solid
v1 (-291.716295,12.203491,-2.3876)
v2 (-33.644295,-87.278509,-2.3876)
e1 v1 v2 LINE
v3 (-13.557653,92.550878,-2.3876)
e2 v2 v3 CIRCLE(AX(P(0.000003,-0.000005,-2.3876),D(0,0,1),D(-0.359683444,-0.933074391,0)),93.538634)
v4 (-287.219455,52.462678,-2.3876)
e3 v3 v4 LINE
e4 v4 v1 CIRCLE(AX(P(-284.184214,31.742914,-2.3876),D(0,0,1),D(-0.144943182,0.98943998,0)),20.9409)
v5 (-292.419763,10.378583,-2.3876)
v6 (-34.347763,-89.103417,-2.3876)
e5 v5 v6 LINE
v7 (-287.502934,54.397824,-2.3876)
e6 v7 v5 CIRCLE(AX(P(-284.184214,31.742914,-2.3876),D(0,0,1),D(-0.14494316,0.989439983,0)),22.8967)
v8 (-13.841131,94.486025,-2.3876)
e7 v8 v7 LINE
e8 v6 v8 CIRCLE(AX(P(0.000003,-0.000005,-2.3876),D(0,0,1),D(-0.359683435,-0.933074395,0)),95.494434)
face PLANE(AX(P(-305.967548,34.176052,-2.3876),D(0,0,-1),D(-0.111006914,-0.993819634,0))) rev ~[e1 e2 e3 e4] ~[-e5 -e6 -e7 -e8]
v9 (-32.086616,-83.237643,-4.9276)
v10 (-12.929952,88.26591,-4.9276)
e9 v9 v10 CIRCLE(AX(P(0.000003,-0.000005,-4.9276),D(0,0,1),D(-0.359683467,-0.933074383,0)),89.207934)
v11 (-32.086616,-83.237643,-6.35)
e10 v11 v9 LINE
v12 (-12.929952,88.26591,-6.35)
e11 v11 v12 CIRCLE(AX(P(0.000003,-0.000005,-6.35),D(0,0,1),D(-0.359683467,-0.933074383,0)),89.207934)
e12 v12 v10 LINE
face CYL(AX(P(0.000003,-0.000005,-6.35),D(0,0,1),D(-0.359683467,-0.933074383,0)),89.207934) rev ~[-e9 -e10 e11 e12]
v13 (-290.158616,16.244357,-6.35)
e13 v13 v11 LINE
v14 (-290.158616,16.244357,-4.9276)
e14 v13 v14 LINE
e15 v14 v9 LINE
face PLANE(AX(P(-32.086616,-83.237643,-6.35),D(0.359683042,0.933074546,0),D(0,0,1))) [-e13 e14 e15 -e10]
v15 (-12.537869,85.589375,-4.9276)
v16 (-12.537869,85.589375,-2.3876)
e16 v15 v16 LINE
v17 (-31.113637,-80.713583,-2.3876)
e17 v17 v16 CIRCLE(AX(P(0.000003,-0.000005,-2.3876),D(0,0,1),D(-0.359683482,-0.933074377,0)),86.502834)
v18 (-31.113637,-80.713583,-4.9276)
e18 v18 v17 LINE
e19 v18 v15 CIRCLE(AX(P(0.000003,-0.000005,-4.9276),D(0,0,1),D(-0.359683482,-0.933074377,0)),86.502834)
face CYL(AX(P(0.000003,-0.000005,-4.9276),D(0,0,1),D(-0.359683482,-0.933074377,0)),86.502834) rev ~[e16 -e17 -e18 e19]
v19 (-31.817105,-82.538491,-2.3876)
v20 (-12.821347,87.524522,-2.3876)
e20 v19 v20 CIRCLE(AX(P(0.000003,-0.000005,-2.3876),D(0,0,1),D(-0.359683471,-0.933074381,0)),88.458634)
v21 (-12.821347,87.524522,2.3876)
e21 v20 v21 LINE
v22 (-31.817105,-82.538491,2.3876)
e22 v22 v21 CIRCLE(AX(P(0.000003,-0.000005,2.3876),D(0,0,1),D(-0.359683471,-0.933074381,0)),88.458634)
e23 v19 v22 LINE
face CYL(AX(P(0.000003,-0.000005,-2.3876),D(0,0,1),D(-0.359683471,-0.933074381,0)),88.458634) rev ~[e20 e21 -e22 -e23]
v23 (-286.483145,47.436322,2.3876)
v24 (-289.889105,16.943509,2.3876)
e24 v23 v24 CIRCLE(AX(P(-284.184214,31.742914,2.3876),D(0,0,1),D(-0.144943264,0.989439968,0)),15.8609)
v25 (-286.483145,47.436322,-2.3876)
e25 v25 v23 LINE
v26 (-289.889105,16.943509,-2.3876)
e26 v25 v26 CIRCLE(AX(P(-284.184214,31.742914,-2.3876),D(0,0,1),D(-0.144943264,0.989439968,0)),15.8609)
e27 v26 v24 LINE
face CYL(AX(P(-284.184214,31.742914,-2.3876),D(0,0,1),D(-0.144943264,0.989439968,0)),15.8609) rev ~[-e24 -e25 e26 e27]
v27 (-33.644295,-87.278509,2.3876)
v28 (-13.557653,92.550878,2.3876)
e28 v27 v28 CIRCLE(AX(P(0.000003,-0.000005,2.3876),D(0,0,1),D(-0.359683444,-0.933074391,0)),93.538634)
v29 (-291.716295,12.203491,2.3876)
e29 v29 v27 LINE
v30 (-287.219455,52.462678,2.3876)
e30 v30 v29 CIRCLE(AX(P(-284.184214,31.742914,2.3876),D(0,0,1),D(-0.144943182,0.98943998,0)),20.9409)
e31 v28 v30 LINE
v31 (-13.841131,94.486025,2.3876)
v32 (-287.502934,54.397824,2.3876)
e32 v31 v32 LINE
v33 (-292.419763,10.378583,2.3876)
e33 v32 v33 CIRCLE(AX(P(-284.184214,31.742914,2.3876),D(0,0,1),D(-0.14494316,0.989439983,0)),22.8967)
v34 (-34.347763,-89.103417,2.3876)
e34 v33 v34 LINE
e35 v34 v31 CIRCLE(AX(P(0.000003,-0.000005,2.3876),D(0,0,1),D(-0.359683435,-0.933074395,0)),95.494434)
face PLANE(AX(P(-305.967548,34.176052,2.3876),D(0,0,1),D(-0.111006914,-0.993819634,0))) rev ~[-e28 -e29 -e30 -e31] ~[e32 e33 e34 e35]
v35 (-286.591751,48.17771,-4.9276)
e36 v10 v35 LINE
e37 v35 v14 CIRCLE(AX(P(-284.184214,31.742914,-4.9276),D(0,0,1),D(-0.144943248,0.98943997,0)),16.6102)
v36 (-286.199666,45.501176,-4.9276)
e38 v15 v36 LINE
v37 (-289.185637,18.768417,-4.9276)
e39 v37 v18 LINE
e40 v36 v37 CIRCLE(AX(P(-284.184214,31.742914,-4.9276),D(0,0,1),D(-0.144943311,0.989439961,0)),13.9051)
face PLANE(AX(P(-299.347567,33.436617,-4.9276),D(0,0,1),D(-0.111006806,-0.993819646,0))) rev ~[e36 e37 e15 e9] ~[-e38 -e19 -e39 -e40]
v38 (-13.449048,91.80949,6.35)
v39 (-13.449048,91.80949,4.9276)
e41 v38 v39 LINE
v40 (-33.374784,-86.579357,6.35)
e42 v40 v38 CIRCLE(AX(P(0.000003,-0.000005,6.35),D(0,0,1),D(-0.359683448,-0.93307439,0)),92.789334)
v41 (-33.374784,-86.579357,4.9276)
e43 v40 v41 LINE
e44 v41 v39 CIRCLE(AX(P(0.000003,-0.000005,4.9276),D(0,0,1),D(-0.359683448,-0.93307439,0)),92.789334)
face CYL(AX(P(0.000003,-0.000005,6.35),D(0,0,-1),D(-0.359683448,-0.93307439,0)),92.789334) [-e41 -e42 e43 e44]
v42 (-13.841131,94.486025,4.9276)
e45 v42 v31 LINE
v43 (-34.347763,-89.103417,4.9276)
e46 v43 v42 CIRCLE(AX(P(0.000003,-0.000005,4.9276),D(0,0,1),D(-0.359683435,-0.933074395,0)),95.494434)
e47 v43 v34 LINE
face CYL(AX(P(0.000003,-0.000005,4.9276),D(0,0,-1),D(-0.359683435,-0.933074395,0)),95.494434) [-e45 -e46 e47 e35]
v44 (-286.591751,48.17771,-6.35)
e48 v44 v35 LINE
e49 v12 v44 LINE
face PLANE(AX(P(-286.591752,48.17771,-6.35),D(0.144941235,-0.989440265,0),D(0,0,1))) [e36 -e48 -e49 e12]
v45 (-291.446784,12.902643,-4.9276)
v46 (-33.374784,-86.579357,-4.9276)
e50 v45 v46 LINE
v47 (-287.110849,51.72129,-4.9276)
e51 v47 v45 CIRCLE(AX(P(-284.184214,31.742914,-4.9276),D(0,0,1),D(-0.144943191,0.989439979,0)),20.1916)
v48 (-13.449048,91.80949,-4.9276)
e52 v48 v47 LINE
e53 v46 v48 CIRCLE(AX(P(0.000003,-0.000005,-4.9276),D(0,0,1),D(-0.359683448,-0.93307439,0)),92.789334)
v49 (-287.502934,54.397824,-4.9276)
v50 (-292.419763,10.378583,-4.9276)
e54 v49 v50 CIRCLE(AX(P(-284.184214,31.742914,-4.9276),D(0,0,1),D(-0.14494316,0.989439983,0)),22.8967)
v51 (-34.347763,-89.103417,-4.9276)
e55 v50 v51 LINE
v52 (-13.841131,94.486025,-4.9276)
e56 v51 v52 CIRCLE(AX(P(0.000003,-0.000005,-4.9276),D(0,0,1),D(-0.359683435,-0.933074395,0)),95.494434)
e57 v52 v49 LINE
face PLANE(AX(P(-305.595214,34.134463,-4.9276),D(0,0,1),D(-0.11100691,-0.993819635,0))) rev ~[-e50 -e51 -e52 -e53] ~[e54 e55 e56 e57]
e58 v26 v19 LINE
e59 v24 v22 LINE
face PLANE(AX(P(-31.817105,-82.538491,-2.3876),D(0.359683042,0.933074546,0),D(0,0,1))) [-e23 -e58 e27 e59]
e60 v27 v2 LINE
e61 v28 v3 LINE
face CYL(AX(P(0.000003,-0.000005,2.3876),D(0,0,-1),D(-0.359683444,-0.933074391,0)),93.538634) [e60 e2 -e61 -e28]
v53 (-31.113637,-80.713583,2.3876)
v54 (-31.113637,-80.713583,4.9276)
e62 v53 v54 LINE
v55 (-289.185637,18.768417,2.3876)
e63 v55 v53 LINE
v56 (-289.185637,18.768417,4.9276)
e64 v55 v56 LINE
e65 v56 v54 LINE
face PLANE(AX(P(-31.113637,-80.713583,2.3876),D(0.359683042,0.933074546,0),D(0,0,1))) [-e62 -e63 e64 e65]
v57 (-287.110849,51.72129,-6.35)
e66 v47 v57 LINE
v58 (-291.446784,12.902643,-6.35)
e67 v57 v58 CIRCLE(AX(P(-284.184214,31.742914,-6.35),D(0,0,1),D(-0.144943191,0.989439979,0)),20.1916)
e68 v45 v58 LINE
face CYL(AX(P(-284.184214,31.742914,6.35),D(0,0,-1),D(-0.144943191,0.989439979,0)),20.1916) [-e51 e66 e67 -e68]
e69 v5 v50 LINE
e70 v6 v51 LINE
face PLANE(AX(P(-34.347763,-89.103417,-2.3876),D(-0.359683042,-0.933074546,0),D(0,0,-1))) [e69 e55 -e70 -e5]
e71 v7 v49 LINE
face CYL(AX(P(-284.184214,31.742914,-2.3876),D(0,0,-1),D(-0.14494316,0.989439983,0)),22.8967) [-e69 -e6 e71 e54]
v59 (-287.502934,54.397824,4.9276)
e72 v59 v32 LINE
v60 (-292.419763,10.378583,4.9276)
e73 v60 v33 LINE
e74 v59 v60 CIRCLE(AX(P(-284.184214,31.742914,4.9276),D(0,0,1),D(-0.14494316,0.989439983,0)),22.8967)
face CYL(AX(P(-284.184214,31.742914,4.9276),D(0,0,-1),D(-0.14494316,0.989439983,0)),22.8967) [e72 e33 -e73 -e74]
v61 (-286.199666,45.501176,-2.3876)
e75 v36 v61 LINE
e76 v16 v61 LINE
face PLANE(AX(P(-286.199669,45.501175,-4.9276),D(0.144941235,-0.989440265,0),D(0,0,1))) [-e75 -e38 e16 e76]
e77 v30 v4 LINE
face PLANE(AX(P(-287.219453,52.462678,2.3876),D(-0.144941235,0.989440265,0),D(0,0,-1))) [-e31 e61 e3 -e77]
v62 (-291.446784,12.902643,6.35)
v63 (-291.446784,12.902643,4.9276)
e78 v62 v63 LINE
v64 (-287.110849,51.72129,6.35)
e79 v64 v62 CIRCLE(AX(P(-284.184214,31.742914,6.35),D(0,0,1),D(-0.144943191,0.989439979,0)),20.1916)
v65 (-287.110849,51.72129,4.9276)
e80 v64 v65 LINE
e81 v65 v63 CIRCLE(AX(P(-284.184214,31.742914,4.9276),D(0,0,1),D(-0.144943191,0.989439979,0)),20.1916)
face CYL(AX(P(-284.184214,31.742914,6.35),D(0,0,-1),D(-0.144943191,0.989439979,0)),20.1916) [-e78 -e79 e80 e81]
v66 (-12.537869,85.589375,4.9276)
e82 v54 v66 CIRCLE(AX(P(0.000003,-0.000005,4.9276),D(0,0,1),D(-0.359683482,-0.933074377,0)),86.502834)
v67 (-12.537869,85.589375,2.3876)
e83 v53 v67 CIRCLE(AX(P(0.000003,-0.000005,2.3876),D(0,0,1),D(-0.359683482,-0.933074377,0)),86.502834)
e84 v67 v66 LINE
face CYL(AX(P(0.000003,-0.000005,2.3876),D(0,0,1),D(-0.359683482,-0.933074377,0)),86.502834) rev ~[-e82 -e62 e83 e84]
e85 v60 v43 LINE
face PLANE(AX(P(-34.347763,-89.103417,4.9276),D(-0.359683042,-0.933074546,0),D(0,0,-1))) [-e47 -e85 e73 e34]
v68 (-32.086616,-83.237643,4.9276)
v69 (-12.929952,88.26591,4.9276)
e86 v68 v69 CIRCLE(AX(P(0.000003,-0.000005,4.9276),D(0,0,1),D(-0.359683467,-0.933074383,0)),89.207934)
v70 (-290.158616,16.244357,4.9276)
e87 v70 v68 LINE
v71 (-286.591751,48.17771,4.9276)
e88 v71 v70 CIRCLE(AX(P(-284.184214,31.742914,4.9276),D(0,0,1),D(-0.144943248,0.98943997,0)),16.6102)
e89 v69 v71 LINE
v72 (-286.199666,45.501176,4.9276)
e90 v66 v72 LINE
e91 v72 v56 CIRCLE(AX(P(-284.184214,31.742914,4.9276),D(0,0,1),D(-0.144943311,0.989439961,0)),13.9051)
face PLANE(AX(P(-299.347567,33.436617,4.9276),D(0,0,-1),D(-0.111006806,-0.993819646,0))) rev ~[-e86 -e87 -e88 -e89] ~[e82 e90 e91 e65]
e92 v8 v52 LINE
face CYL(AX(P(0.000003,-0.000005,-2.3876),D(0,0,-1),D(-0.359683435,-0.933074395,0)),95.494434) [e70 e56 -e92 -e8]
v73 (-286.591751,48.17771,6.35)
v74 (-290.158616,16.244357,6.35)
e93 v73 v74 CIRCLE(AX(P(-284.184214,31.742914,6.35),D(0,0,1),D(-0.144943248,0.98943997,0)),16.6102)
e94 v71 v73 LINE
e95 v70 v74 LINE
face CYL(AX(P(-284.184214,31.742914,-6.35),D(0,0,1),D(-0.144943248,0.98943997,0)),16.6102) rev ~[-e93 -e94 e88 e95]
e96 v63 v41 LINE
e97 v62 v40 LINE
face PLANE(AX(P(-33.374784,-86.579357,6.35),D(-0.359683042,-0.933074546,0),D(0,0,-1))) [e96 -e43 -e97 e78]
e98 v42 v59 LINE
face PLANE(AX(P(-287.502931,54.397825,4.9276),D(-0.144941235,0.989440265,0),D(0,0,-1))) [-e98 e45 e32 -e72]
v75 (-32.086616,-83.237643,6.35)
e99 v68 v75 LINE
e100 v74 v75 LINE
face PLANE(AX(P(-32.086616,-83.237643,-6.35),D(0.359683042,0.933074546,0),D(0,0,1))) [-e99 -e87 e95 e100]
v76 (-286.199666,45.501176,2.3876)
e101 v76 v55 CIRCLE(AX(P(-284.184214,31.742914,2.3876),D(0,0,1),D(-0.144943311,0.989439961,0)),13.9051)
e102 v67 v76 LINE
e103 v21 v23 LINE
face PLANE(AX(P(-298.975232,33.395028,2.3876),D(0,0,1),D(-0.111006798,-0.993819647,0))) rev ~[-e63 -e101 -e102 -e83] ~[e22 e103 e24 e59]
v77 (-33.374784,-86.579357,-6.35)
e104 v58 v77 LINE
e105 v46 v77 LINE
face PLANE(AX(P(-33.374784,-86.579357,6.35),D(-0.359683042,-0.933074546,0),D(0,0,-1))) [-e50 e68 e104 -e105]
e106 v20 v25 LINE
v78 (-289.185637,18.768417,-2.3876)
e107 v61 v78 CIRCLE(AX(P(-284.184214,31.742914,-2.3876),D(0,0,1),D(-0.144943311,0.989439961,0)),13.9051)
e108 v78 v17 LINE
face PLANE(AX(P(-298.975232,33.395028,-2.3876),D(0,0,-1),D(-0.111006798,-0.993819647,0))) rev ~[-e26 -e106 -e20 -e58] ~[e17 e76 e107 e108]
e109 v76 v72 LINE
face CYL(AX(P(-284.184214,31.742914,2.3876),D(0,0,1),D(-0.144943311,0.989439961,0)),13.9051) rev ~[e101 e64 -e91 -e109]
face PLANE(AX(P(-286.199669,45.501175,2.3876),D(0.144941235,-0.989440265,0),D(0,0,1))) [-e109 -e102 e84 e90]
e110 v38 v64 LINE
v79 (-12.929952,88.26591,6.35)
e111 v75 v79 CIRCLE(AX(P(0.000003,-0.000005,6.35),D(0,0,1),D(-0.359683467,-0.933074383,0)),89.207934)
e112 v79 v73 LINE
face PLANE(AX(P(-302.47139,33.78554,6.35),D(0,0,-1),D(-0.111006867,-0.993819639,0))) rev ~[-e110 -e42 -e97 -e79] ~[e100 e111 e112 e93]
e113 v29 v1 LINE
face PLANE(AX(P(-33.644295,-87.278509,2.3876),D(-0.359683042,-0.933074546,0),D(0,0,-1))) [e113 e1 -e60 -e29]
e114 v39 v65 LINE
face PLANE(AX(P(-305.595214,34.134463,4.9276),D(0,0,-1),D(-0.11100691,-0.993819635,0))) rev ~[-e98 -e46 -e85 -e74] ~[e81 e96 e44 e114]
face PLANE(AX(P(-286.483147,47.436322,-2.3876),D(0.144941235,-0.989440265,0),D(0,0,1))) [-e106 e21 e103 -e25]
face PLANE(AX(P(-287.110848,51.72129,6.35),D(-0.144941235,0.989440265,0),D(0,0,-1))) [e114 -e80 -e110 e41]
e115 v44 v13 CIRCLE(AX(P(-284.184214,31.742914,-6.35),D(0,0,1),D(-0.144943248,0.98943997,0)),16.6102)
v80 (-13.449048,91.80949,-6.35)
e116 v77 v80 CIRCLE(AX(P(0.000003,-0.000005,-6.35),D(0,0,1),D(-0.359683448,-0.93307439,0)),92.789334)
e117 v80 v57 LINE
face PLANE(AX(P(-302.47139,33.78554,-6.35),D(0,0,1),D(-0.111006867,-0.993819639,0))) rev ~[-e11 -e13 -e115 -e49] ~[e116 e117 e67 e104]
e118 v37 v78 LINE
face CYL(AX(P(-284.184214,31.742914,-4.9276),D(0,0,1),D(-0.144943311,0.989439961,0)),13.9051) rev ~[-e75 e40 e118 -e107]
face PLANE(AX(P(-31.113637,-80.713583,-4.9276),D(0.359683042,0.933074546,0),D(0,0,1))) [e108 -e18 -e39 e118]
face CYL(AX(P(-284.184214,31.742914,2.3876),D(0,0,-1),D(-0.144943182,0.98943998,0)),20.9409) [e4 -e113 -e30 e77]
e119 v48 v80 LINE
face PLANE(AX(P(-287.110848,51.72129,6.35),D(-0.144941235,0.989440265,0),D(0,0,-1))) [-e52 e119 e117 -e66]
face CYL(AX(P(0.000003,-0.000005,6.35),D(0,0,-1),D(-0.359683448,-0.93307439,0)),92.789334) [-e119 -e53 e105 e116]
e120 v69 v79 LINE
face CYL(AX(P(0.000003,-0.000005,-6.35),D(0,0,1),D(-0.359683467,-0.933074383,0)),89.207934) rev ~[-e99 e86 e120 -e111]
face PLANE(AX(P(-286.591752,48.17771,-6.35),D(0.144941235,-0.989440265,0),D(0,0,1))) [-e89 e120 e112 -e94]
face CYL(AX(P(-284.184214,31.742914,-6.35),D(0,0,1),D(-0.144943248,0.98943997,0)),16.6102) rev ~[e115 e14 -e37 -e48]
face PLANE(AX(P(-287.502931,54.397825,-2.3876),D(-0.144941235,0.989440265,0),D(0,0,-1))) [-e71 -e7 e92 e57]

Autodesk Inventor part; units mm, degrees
ref_plane "Work Plane2" through (-284.1842, 31.7429, 0) normal (-1, 0, 0) x (0, 0, 1)
ref_plane "Work Plane3" through (0, 0, 0) normal (-0.9927675, -0.1200526, 0) x (0, 0, 1)
sketch "Path" plane through (0, 0, 0) normal (0, 0, 1) x (1, 0, 0)
  arc A0 (-286.8513, 49.9495) -> (-290.8027, 14.5735) centre (-284.1842, 31.7429) ccw
  arc A1 (-32.7307, -84.9085) -> (-13.1895, 90.0377) centre (0, 0) ccw
  line L0 (-32.7307, -84.9085) -> (-290.8027, 14.5735)
  line L1 (-286.8513, 49.9495) -> (-13.1895, 90.0377)
  dimension "d31" = 8.9916
ref_plane "Section Plane" through (-290.8027, 14.5735, 0) normal (0.9330746, -0.359683, 0) x (0, 0, 1)
sketch "Section Sketch" plane through (-290.8027, 14.5735, 0) normal (0.9330746, -0.359683, 0) x (0, 0, 1)
  line L0 (-6.35, -1.7907) -> (6.35, -1.7907)
  line L1 (6.35, -1.7907) -> (6.35, 1.7907)
  line L2 (6.35, 1.7907) -> (-6.35, 1.7907)
  line L3 (-6.35, 1.7907) -> (-6.35, -1.7907)
  line L4 (-2.3876, -2.54) -> (2.3876, -2.54)
  line L5 (2.3876, -2.54) -> (2.3876, 2.54)
  line L6 (2.3876, 2.54) -> (-2.3876, 2.54)
  line L7 (-2.3876, 2.54) -> (-2.3876, -2.54)
  line L8 (-2.3876, 0) -> (2.3876, 0) construction
  line L9 (-4.9276, -4.4958) -> (-2.3876, -4.4958)
  line L10 (-2.3876, -4.4958) -> (-2.3876, 4.4958)
  line L11 (-2.3876, 4.4958) -> (-4.9276, 4.4958)
  line L12 (-4.9276, 4.4958) -> (-4.9276, -4.4958)
  line L13 (2.3876, -4.4958) -> (4.9276, -4.4958)
  line L14 (4.9276, -4.4958) -> (4.9276, 4.4958)
  line L15 (4.9276, 4.4958) -> (2.3876, 4.4958)
  line L16 (2.3876, 4.4958) -> (2.3876, -4.4958)
  line L17 (-6.35, 0) -> (6.35, 0) construction
  point P0 (0, 0)
  point P1 (0, 0)
  dimension "d21" = 3.5814
  dimension "d22" = 5.08
  dimension "d23" = 4.7752
  dimension "d24" = 2.54
  dimension "d31" = 8.9916
  dimension "d32" = 12.7
sweep "Solid" add profiles "Section Sketch" path "Path"
pattern_of_one "Strand Pattern"
equation "\"d21\" = da_d2"
equation "\"d22\" = da_d1"
equation "\"d23\" = da_b1"
equation "\"d24\" = da_t1 + da_t2"
equation "\"d30\" = da_pt"
equation "\"da_p\" = 9.525"
equation "\"da_b1\" = 4.7752"
equation "\"da_h2\" = 8.9916"
equation "\"da_h3\" = 7.7978"
equation "\"da_d1\" = 5.08"
equation "\"da_d2\" = 3.5814"
equation "\"da_pt\" = 10.1346"
equation "\"da_b\" = 12.7"
equation "\"da_t1\" = 1.27"
equation "\"da_t2\" = 1.27"
properties part number "Roller Chain"
